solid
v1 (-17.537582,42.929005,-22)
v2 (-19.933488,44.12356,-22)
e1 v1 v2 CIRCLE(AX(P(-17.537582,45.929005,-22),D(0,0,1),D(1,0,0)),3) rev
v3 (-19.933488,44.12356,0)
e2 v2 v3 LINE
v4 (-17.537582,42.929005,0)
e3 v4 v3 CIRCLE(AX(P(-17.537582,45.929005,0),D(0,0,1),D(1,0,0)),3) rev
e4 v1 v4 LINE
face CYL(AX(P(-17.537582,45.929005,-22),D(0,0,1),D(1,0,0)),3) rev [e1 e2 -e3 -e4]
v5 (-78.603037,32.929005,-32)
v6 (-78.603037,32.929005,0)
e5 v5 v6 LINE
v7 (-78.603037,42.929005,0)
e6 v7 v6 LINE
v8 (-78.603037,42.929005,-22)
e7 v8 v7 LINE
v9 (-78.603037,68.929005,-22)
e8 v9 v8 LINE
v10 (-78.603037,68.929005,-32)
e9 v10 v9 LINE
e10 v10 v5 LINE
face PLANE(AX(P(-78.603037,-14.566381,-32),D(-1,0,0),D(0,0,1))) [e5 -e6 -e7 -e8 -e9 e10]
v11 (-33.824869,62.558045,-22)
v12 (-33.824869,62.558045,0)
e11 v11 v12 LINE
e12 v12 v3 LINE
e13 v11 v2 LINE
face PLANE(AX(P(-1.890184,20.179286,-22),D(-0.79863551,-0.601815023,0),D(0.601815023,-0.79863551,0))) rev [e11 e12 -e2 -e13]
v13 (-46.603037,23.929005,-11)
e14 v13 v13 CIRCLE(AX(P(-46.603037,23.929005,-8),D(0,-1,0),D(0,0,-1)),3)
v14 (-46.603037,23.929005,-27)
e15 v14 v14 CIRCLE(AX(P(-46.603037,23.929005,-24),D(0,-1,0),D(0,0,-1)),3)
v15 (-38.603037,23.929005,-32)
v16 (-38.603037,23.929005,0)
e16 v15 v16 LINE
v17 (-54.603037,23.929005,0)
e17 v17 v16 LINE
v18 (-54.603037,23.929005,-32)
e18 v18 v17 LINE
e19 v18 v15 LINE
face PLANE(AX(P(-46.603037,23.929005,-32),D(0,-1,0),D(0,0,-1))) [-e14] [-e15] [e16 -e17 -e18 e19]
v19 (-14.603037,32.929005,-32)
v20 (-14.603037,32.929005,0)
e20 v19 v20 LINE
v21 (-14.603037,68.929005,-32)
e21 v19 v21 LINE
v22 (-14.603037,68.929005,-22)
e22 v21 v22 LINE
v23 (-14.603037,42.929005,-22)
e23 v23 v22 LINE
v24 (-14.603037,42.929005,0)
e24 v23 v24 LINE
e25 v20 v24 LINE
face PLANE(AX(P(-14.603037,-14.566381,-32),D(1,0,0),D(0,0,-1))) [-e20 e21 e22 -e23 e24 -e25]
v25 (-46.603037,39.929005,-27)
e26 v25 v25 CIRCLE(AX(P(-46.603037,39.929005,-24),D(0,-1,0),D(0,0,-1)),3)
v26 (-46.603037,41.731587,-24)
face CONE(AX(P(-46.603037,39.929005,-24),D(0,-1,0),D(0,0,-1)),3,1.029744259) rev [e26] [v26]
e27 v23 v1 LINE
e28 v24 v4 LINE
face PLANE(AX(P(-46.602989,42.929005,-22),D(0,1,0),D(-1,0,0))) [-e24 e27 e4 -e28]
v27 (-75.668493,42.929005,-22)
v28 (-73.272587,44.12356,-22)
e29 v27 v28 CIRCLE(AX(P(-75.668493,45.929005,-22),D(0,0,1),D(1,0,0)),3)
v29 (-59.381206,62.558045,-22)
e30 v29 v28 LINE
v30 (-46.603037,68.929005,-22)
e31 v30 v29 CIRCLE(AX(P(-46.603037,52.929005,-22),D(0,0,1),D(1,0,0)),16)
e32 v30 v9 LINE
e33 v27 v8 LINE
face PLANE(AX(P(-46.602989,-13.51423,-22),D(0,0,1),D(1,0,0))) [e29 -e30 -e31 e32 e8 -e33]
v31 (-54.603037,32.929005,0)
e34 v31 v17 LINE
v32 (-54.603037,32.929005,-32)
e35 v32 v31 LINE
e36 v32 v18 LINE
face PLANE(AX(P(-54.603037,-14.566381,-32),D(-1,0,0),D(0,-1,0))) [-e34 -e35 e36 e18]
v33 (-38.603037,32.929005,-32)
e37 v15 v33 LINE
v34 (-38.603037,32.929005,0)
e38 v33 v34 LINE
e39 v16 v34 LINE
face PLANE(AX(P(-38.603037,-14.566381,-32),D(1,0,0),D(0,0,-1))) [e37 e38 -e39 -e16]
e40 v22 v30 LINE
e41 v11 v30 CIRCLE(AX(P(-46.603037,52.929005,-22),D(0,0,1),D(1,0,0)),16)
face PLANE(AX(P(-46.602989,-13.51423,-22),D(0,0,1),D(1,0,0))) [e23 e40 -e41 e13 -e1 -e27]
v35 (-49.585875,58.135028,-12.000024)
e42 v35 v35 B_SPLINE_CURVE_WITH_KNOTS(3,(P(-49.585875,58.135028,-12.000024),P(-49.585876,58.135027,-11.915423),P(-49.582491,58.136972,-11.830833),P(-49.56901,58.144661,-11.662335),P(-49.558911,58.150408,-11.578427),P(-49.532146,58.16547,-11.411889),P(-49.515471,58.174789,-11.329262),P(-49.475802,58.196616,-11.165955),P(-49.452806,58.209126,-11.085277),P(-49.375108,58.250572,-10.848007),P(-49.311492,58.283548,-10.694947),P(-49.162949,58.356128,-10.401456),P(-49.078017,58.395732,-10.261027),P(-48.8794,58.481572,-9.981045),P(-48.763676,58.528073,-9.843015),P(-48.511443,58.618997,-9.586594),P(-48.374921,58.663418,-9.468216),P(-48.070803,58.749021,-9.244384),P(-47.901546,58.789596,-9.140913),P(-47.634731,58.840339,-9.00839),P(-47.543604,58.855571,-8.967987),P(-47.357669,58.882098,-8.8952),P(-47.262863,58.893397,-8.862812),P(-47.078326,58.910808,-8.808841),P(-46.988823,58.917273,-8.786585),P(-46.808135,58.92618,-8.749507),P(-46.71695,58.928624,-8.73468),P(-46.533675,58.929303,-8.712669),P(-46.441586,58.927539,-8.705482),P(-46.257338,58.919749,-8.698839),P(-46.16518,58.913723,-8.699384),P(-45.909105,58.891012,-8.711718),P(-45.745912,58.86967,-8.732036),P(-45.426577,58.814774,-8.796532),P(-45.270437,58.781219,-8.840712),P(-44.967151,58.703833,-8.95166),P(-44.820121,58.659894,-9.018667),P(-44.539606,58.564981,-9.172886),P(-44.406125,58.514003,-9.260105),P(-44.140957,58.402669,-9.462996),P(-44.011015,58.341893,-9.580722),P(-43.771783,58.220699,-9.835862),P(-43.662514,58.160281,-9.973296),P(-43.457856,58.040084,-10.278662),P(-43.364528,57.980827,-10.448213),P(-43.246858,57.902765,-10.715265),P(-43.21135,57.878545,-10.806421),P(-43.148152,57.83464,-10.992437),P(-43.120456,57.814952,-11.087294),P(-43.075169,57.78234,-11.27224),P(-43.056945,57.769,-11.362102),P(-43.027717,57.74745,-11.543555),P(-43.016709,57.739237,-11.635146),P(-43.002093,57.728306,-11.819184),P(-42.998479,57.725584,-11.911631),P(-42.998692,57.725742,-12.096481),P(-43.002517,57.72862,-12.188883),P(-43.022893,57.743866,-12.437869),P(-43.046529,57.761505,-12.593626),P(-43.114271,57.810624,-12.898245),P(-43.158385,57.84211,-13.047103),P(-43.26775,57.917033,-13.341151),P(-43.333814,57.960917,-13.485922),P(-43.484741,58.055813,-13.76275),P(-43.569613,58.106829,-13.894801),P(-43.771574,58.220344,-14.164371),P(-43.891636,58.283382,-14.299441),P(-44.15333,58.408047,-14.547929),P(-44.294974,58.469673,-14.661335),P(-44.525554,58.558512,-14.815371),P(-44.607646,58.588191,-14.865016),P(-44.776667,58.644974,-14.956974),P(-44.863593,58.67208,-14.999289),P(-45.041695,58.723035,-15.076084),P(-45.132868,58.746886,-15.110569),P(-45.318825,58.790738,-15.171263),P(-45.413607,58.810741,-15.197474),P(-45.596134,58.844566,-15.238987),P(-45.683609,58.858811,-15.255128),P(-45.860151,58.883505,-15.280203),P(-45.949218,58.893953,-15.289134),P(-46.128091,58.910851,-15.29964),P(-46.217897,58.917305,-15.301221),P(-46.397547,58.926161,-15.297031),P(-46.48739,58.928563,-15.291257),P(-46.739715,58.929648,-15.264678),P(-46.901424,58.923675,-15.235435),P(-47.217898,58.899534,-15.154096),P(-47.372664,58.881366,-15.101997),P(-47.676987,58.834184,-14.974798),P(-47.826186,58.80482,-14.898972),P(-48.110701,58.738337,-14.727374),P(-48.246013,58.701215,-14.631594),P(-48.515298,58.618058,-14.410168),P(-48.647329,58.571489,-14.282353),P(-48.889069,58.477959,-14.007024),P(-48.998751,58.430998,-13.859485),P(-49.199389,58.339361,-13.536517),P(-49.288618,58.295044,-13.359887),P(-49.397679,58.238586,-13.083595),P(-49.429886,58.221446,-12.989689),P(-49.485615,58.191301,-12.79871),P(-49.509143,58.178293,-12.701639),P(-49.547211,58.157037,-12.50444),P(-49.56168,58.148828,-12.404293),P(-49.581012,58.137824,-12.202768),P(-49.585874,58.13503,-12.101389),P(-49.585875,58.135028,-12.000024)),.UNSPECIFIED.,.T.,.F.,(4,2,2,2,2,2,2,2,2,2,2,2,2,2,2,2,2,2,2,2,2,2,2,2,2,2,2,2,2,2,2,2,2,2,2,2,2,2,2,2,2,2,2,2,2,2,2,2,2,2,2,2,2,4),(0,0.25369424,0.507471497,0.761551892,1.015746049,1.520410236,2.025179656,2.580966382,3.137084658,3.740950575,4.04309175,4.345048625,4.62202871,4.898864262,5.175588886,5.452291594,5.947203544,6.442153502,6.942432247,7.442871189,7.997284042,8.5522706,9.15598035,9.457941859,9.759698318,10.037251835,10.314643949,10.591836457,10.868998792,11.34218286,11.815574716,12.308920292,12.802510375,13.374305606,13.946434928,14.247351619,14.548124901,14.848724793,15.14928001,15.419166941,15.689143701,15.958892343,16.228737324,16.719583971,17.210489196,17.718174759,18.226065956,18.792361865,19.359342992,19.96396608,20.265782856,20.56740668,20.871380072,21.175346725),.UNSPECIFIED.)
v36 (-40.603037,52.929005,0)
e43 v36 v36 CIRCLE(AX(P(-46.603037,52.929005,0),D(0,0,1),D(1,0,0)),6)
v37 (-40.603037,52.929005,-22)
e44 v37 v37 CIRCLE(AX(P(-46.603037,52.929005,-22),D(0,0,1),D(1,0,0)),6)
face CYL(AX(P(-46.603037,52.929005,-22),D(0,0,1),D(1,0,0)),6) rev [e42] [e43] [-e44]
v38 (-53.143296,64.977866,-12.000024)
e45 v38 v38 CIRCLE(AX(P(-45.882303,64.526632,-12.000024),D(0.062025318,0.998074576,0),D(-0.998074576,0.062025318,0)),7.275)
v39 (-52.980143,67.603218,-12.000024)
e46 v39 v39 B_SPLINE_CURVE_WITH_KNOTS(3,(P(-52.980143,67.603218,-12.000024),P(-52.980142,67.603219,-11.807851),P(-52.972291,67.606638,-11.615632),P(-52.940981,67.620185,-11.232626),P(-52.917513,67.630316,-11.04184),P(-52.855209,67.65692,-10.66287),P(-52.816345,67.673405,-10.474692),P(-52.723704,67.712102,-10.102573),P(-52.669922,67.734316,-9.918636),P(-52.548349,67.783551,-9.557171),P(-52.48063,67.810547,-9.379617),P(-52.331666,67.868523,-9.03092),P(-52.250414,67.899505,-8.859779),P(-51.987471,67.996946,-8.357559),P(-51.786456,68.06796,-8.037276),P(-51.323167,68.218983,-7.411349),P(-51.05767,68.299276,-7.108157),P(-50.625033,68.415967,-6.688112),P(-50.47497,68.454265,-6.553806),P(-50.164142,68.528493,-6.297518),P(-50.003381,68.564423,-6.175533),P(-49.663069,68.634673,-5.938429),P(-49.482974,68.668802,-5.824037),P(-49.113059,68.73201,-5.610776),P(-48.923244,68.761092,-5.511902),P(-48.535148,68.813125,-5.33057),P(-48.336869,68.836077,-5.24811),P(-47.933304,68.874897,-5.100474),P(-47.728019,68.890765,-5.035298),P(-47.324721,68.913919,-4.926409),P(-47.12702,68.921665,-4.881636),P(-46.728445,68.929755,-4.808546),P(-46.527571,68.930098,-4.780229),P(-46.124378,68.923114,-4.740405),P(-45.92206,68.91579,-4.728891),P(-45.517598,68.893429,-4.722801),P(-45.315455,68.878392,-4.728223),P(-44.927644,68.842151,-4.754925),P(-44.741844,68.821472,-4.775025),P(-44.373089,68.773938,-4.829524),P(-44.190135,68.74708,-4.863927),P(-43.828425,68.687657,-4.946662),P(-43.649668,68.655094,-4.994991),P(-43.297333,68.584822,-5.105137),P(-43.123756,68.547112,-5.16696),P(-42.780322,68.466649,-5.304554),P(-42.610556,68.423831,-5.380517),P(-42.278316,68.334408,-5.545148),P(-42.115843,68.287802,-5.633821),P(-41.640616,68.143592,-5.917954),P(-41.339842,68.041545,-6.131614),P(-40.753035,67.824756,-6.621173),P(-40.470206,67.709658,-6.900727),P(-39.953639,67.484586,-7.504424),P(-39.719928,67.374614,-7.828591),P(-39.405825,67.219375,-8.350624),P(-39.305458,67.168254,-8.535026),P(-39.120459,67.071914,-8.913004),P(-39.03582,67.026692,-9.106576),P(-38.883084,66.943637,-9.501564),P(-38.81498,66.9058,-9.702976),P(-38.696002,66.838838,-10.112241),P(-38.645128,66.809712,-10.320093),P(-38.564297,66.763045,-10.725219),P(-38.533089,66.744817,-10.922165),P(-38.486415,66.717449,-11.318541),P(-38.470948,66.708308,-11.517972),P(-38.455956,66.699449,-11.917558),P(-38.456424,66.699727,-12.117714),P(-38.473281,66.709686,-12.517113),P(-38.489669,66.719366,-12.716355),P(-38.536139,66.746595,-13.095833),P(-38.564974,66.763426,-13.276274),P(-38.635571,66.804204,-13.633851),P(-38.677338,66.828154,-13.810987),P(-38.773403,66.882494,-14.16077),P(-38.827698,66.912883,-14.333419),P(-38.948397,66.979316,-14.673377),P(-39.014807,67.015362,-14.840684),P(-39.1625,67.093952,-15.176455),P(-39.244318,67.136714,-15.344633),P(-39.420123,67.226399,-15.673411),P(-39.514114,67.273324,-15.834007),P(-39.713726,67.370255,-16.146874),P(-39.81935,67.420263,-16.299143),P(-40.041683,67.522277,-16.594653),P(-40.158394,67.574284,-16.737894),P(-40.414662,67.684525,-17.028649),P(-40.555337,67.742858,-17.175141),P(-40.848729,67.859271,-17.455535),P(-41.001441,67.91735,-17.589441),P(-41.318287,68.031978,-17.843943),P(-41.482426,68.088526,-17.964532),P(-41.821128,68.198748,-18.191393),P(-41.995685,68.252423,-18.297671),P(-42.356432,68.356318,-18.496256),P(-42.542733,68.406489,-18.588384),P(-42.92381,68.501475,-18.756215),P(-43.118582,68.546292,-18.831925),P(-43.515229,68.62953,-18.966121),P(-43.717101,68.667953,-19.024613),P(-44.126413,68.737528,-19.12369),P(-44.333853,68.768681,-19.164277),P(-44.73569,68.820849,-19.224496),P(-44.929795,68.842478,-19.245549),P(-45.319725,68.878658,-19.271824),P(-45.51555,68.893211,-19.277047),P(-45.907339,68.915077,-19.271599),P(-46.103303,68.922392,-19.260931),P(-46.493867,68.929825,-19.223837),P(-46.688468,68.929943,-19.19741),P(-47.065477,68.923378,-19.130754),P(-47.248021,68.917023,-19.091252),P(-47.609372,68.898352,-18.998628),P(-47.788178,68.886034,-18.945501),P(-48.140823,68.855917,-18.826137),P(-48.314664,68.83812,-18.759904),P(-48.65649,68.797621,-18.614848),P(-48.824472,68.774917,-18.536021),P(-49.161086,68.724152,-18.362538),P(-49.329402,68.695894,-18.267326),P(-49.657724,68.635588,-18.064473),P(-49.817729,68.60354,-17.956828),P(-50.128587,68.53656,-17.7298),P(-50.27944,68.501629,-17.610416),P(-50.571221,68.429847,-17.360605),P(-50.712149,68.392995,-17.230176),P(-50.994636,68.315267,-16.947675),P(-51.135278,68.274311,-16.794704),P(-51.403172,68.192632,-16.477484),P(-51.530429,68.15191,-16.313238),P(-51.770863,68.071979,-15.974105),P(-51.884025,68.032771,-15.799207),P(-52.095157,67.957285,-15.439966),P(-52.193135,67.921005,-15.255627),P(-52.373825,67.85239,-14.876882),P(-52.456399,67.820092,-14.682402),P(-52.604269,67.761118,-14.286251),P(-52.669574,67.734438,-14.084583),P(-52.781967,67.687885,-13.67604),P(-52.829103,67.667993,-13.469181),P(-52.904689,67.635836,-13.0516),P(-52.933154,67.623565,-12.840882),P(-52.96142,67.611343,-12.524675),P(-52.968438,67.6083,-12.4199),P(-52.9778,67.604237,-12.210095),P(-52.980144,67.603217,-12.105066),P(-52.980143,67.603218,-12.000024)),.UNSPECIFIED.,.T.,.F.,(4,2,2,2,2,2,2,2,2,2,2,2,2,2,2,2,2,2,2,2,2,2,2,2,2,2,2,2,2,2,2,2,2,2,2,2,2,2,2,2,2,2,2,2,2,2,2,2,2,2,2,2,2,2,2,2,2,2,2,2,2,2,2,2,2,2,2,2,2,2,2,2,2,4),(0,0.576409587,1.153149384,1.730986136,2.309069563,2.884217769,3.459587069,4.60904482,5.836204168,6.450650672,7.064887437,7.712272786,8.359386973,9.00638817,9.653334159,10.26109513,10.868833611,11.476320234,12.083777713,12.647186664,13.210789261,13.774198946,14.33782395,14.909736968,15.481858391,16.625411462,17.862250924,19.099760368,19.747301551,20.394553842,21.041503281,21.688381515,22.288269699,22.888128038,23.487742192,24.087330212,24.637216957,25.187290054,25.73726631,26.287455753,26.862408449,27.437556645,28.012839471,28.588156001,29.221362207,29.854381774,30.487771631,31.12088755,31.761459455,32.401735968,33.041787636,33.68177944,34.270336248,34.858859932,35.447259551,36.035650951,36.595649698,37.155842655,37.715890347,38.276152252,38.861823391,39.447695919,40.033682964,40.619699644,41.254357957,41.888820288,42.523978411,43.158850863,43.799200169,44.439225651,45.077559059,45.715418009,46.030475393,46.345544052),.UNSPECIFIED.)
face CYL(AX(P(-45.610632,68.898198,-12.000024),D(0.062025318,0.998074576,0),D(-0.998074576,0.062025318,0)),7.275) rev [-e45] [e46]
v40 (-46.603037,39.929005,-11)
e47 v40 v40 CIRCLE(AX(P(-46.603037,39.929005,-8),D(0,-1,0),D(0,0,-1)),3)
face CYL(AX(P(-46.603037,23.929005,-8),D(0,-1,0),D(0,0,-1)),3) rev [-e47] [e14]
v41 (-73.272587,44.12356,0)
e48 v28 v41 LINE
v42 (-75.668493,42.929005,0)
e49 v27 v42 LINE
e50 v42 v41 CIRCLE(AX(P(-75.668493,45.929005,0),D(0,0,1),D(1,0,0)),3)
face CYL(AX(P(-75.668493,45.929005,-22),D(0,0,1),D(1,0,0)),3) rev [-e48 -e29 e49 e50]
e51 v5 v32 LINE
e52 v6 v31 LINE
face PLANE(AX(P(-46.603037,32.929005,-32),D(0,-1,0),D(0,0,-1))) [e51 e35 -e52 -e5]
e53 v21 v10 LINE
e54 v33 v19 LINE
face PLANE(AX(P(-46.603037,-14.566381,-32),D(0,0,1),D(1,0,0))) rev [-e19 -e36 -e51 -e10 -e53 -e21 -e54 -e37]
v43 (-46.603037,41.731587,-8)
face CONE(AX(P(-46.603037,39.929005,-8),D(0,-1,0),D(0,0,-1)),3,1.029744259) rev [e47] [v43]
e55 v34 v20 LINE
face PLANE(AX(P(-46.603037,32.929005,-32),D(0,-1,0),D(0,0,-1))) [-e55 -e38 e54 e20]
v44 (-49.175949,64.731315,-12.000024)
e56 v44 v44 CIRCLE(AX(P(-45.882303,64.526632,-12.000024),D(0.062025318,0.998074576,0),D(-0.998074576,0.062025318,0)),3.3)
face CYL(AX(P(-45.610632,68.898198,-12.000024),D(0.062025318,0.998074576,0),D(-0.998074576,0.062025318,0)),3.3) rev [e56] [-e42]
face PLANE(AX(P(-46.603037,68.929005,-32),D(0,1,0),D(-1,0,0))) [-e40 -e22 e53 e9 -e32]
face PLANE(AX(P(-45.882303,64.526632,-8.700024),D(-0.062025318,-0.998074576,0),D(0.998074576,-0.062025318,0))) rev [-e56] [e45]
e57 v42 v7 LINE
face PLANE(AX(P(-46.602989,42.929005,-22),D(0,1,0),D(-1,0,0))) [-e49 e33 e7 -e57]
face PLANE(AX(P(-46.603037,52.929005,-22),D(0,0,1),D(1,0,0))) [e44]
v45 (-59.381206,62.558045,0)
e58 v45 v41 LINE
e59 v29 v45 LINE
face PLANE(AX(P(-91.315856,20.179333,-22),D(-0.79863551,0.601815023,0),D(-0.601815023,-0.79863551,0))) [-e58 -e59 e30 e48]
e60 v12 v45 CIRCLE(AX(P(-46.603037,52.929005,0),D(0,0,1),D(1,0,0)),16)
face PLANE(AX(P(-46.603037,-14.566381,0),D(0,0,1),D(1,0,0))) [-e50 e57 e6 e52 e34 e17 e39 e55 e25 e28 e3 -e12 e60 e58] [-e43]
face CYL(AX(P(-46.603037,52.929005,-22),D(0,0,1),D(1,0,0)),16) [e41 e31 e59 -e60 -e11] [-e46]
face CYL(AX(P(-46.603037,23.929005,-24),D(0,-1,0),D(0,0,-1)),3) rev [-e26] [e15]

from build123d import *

# Parameters (mm, degrees)
EXTRUDE6_DEPTH               = 32
EXTRUDE13_DEPTH              = 22
SKETCH12_R                   = 6
EXTRUDE14_DEPTH              = 22
F_6_0_6_DIAMETER_HOLE1_D     = 6
F_6_0_6_DIAMETER_HOLE1_DEPTH = 16
F_6_0_6_DIAMETER_HOLE1_TIP   = 1.802581857


# Read off the part's stored shape, not the designer's step: CBORE for M6 Hex Head Bolt1
with BuildPart() as part:
    # Sketch8 → Extrude6 (new body)
    with BuildSketch(Plane.XY):
        Polygon((-78.603037361, 32.929005068), (-54.603037361, 32.929005068), (-54.603037361, 23.929005068), (-38.603037361, 23.929005068), (-38.603037361, 32.929005068), (-14.603037361, 32.929005068), (-14.603037361, 68.929005068), (-78.603037361, 68.929005068), align=None)
    extrude(amount=-EXTRUDE6_DEPTH)

    # Sketch9 → Extrude13 (cut)
    with BuildSketch(Plane.XY):
        with BuildLine():
            Line((-73.272586686, 44.123559999), (-59.381205522, 62.558045439))
            ThreePointArc((-59.381205522, 62.558045439), (-53.742202371, 67.247954854), (-46.603037361, 68.929005068))
            Line((-46.603037361, 68.929005068), (-78.603037361, 68.929005068))
            Line((-78.603037361, 68.929005068), (-78.603037361, 42.929005068))
            Line((-78.603037361, 42.929005068), (-75.668493217, 42.929005068))
            ThreePointArc((-75.668493217, 42.929005068), (-74.329899777, 43.244201983), (-73.272586686, 44.123559999))
        make_face()
        with BuildLine():
            Line((-14.603037361, 68.929005068), (-46.603037361, 68.929005068))
            ThreePointArc((-46.603037361, 68.929005068), (-39.463872351, 67.247954854), (-33.8248692, 62.558045439))
            Line((-33.8248692, 62.558045439), (-19.933488035, 44.123559999))
            ThreePointArc((-19.933488035, 44.123559999), (-18.876174944, 43.244201983), (-17.537581505, 42.929005068))
            Line((-17.537581505, 42.929005068), (-14.603037361, 42.929005068))
            Line((-14.603037361, 42.929005068), (-14.603037361, 68.929005068))
        make_face()
    extrude(amount=-EXTRUDE13_DEPTH, mode=Mode.SUBTRACT)

    # Sketch12 → Extrude14 (cut)
    with BuildSketch(Plane.XY):
        with Locations((-46.603037361, 52.929005068)):
            Circle(SKETCH12_R)
    extrude(amount=-EXTRUDE14_DEPTH, mode=Mode.SUBTRACT)

    # Ø6.0 (6) Diameter Hole1
    with Locations(Plane(origin=(-46.603037361, 23.929005068, -8), x_dir=(0, 0, -1), z_dir=(0, -1, 0))):
        with Locations((0, 0), (16, 0)):
            Hole(F_6_0_6_DIAMETER_HOLE1_D / 2, depth=F_6_0_6_DIAMETER_HOLE1_DEPTH)
            with Locations((0, 0, -(F_6_0_6_DIAMETER_HOLE1_DEPTH + F_6_0_6_DIAMETER_HOLE1_TIP / 2))):  # 118° drill point
                Cone(0, F_6_0_6_DIAMETER_HOLE1_D / 2, F_6_0_6_DIAMETER_HOLE1_TIP, mode=Mode.SUBTRACT)

    # CBORE for M6 Hex Head Bolt1 outline → CBORE for M6 Hex Head Bolt1 (revolve, cut)
    with BuildSketch(Plane(origin=(-49.700366285, 3.088627955, -12.000023726), x_dir=(0.9980745763174489, -0.06202531828813871, 0), z_dir=(0, 0, 1))):
        Polygon((0, 54.947204966), (3.3, 54.947204966), (3.3, 61.556526083), (7.275, 61.556526083), (7.275, 65.936761667), (0, 65.936761667), align=None)
    revolve(axis=Axis((-49.700366285, 3.088627955, -12.000023726), (0.062025318288138724, 0.9980745763174491, 0)), mode=Mode.SUBTRACT)


solid = part.part
